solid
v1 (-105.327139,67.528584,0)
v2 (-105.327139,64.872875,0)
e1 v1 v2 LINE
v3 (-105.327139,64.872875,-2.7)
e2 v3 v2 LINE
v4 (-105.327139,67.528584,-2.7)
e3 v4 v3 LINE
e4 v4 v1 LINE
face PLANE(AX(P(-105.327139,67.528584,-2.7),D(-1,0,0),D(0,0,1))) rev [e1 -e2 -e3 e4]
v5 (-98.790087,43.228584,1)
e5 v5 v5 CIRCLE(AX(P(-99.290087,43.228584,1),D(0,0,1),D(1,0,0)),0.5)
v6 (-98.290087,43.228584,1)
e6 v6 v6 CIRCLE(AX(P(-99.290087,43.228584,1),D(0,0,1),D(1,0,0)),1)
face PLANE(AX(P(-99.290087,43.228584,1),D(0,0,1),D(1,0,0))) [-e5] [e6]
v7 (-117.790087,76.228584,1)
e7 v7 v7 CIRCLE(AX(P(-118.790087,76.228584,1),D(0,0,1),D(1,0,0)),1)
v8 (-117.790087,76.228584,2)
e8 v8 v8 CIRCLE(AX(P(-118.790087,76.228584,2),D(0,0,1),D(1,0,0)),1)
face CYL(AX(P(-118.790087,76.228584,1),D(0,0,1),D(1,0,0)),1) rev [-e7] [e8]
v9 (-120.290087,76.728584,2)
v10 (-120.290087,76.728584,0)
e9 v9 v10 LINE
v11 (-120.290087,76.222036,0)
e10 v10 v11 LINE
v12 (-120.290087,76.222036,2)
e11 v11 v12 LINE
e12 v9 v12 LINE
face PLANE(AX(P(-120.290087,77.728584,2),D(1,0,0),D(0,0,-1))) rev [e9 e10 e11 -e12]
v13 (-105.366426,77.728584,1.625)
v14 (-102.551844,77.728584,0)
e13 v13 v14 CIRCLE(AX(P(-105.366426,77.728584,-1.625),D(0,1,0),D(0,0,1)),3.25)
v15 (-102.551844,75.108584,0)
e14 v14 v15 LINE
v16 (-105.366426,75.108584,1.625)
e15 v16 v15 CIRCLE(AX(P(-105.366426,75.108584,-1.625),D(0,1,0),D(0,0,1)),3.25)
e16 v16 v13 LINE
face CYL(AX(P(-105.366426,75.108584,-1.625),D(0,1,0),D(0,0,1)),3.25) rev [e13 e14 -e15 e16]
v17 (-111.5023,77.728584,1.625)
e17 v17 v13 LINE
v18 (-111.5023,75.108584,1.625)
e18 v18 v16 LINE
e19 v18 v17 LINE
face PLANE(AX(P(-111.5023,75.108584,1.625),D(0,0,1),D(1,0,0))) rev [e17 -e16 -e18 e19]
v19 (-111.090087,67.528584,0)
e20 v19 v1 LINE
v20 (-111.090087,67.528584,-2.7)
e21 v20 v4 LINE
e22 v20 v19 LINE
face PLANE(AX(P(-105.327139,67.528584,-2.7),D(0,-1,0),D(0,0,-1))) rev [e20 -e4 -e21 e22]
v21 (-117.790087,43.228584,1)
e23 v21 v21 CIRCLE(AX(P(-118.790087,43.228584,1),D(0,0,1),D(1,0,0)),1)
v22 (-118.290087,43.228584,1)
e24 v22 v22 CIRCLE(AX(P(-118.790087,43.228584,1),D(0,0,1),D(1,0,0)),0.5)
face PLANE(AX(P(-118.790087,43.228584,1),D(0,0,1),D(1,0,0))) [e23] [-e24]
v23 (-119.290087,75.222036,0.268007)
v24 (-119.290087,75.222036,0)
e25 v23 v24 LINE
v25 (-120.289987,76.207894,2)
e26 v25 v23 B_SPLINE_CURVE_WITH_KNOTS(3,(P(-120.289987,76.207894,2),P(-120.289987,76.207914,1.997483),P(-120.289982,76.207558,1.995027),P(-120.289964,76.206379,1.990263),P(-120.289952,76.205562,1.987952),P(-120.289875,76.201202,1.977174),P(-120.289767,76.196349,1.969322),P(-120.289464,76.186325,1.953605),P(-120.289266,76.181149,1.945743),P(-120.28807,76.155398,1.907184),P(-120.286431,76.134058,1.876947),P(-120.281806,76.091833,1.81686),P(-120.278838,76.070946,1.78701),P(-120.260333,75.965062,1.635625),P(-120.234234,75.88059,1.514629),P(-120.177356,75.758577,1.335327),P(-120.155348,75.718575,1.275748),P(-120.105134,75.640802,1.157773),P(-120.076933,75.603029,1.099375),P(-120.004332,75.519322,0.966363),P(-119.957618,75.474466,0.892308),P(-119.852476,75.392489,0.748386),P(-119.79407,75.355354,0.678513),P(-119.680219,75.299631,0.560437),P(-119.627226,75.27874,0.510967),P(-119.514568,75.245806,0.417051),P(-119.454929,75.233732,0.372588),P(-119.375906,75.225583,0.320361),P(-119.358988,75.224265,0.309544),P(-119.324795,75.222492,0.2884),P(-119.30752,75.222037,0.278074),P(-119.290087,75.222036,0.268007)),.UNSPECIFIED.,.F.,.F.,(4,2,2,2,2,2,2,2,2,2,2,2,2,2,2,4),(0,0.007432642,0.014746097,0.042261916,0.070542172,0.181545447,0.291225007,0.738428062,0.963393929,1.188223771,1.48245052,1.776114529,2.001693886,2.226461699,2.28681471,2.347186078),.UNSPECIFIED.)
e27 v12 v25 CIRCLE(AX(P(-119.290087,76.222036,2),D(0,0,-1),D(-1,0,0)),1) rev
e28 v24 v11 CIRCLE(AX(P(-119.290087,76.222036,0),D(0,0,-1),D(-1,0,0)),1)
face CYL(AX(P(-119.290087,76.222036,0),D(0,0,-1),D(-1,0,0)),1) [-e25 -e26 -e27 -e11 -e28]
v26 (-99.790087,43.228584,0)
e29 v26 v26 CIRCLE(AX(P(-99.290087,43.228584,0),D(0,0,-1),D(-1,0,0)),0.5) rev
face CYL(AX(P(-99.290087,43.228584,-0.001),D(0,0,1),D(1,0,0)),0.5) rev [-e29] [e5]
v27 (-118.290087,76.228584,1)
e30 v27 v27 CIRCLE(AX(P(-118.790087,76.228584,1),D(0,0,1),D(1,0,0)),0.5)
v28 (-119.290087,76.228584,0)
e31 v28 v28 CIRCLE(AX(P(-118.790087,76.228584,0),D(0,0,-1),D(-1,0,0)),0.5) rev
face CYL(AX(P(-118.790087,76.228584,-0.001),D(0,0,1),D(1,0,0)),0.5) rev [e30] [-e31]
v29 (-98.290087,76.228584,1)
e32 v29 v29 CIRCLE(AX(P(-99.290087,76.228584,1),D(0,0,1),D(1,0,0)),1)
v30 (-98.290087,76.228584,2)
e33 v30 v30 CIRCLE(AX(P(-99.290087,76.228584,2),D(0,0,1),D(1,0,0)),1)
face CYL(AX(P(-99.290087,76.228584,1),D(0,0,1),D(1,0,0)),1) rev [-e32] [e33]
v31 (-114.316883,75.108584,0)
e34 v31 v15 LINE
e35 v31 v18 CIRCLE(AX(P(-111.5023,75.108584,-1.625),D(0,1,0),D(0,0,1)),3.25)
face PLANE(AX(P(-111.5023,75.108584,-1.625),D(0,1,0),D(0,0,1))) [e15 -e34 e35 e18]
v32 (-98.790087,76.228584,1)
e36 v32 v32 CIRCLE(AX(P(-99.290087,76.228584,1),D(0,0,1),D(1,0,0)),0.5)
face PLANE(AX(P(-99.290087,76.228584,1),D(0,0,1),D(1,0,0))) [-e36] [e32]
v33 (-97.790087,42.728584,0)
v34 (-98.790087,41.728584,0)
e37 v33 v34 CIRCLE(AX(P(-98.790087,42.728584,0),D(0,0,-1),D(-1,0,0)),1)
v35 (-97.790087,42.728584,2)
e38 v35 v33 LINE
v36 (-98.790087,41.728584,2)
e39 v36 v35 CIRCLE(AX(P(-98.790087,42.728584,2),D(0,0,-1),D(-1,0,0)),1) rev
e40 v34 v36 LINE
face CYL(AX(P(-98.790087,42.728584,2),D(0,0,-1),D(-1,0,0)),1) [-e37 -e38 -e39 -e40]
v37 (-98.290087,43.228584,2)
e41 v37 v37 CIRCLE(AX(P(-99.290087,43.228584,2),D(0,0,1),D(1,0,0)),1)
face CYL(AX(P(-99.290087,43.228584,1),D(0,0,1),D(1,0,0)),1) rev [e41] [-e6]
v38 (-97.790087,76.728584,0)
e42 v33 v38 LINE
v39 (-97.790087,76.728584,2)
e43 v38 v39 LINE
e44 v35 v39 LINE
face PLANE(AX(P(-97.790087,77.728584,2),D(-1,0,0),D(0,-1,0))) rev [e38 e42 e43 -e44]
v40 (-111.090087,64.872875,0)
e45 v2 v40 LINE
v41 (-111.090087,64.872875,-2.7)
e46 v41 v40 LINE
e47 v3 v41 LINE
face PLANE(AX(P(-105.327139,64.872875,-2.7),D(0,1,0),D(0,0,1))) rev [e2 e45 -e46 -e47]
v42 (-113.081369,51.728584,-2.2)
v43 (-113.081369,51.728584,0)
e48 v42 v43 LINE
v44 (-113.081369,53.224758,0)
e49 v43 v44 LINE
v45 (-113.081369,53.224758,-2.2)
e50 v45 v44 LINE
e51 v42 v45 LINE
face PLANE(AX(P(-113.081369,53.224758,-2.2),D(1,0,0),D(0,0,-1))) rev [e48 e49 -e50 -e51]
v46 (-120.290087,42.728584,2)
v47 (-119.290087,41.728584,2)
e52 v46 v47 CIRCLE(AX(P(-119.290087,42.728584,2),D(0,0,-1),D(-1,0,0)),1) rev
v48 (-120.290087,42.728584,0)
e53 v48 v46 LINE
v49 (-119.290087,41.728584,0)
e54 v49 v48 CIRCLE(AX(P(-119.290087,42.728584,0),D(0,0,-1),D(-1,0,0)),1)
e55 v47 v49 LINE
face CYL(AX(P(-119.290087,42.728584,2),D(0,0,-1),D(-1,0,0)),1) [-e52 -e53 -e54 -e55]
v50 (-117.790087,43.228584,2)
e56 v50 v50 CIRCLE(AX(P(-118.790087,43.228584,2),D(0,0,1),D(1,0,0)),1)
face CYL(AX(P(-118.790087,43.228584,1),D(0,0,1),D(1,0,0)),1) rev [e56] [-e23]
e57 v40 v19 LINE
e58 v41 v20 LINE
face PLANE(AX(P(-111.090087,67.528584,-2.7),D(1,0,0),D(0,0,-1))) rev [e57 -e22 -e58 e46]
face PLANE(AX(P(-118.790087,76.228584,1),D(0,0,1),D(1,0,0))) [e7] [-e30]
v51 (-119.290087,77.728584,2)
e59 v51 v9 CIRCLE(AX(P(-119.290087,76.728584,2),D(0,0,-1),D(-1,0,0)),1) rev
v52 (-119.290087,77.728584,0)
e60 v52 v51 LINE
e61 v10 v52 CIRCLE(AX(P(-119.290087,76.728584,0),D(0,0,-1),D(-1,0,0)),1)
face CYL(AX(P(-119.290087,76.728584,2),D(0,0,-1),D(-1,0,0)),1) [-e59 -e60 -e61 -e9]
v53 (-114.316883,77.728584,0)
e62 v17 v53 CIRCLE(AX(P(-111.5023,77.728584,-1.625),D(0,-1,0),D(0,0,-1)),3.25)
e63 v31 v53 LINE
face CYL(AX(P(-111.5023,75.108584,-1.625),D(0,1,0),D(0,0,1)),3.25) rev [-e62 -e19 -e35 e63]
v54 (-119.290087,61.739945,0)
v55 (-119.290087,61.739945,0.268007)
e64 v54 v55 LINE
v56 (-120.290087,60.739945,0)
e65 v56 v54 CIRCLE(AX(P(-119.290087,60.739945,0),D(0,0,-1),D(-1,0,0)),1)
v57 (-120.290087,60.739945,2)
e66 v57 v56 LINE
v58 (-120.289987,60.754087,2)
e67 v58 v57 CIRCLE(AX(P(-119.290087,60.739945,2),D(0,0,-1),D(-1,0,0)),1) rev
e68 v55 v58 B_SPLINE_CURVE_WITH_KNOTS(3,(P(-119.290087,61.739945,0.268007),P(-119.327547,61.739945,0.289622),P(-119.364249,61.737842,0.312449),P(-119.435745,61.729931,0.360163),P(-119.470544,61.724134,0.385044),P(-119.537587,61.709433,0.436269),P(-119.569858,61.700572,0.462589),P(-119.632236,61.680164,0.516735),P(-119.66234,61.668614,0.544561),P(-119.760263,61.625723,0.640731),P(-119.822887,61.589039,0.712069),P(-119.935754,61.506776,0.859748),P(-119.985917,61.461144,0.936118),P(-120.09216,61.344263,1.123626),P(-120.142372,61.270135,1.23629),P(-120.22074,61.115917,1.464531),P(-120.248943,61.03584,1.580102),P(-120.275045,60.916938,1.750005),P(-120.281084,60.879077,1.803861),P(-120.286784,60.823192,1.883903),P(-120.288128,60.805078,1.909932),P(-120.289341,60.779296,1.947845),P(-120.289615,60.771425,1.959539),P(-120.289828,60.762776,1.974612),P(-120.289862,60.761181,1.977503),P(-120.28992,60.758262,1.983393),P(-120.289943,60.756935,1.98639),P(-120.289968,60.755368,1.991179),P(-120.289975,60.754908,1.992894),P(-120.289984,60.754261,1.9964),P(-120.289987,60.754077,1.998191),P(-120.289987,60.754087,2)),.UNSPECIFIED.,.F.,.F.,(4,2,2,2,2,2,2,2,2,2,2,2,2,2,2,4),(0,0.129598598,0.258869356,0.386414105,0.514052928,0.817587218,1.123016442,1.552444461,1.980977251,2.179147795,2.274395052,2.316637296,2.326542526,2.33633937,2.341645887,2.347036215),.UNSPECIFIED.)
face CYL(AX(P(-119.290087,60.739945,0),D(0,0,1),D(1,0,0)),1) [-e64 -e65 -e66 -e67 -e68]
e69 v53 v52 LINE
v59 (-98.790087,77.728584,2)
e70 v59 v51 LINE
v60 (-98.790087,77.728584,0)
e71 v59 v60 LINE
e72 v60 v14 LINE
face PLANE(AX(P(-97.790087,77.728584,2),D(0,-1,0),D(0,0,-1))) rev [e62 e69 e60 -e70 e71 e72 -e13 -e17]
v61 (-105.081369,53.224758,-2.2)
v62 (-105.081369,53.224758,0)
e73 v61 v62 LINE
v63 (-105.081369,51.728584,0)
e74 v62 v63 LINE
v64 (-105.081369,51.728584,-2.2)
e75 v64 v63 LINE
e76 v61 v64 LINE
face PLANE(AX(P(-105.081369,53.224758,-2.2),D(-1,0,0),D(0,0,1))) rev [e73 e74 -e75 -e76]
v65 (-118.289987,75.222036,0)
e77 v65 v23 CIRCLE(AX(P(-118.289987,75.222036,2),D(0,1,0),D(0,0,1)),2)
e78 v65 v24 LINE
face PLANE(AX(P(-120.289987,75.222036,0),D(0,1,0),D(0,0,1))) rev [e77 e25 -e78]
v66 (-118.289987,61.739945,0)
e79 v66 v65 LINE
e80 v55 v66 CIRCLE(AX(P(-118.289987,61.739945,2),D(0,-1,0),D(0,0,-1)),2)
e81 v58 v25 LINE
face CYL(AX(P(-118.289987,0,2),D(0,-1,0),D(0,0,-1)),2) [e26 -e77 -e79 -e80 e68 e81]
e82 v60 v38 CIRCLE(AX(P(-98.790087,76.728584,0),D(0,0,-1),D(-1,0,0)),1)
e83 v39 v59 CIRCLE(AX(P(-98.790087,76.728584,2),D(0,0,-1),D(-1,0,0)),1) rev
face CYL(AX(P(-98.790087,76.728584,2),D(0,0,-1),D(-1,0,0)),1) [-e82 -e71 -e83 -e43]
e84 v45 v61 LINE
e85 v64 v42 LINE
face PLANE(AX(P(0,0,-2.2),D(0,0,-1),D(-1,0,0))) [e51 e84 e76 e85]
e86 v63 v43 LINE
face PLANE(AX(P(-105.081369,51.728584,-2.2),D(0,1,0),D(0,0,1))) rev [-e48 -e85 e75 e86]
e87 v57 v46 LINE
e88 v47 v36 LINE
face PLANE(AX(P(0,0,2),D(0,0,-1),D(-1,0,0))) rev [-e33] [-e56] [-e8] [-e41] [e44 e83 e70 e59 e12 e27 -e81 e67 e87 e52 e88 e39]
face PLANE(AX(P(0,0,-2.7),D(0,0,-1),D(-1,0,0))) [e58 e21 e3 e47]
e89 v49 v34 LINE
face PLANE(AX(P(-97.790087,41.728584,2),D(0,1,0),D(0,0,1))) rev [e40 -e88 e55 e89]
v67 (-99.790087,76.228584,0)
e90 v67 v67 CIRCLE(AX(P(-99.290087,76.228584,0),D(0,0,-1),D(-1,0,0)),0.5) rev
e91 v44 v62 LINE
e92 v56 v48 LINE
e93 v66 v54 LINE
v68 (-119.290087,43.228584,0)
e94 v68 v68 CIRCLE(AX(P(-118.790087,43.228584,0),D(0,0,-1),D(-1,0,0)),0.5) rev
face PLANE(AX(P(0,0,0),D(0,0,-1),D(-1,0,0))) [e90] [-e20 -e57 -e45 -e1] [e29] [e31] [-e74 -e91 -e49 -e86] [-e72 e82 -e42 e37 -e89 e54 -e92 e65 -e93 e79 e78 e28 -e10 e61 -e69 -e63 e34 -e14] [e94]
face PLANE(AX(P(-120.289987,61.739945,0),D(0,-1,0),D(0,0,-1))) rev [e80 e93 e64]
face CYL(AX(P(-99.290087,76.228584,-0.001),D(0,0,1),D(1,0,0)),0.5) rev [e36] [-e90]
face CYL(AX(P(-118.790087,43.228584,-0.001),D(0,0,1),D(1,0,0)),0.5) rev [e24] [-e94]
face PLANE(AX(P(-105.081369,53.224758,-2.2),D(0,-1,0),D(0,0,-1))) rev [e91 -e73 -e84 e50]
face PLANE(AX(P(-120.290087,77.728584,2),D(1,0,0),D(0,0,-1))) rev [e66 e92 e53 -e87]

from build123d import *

# Parameters (mm, degrees)
SKETCH_1_W          = 22.5
SKETCH_1_H          = 36
EXTRUDE_1_DEPTH     = 2
SKETCH_9_R          = 1
CUT_EXTRUDE_3_DEPTH = 1
CUT_EXTRUDE_4_REACH = 145.222
SKETCH_10_R         = 0.5
FILLET_1_R          = 1
SKETCH_11_W         = 5.762947655
SKETCH_11_H         = 2.6557086
EXTRUDE_2_DEPTH     = 2.7
SKETCH_12_W         = 8
SKETCH_12_H         = 1.496173859
EXTRUDE_3_DEPTH     = 2.2
SKETCH_14_W         = 2
SKETCH_14_H         = 13.482091112
CUT_EXTRUDE_6_DEPTH = 0.0001
FILLET_3_R          = 2
CUT_EXTRUDE_7_DEPTH = 2.62
FILLET_7_R          = 1


with BuildPart() as part:
    # 草图1 → 凸台-拉伸1 (new body)
    with BuildSketch(Plane.XY):
        with Locations((-109.040086771, 59.72858385)):
            Rectangle(SKETCH_1_W, SKETCH_1_H)
    extrude(amount=EXTRUDE_1_DEPTH)

    # 草图9 → 切除-拉伸3 (cut)
    with BuildSketch(Plane.XY.offset(2)):
        with Locations((-99.290086771, 76.22858385)):
            Circle(SKETCH_9_R)
        with Locations((-99.290086771, 43.22858385)):
            Circle(SKETCH_9_R)
        with Locations((-118.790086771, 43.22858385)):
            Circle(SKETCH_9_R)
        with Locations((-118.790086771, 76.22858385)):
            Circle(SKETCH_9_R)
    extrude(amount=-CUT_EXTRUDE_3_DEPTH, mode=Mode.SUBTRACT)

    # 草图10 → 切除-拉伸4 (cut, up to next)
    with BuildSketch(Plane.XY.offset(1), mode=Mode.PRIVATE) as cut_extrude_4_sk1:
        with Locations((-118.790086771, 43.22858385)):
            Circle(SKETCH_10_R)
    cut_extrude_4_tool1 = extrude(cut_extrude_4_sk1.sketch, amount=-CUT_EXTRUDE_4_REACH, mode=Mode.PRIVATE) & part.part
    # 草图10 → 切除-拉伸4 (cut, up to next)
    with BuildSketch(Plane.XY.offset(1), mode=Mode.PRIVATE) as cut_extrude_4_sk2:
        with Locations((-99.290086771, 43.22858385)):
            Circle(SKETCH_10_R)
    cut_extrude_4_tool2 = extrude(cut_extrude_4_sk2.sketch, amount=-CUT_EXTRUDE_4_REACH, mode=Mode.PRIVATE) & part.part
    # 草图10 → 切除-拉伸4 (cut, up to next)
    with BuildSketch(Plane.XY.offset(1), mode=Mode.PRIVATE) as cut_extrude_4_sk3:
        with Locations((-99.290086771, 76.22858385)):
            Circle(SKETCH_10_R)
    cut_extrude_4_tool3 = extrude(cut_extrude_4_sk3.sketch, amount=-CUT_EXTRUDE_4_REACH, mode=Mode.PRIVATE) & part.part
    # 草图10 → 切除-拉伸4 (cut, up to next)
    with BuildSketch(Plane.XY.offset(1), mode=Mode.PRIVATE) as cut_extrude_4_sk4:
        with Locations((-118.790086771, 76.22858385)):
            Circle(SKETCH_10_R)
    cut_extrude_4_tool4 = extrude(cut_extrude_4_sk4.sketch, amount=-CUT_EXTRUDE_4_REACH, mode=Mode.PRIVATE) & part.part
    add(cut_extrude_4_tool1.solids().sort_by_distance((-118.790087, 43.228584, 1))[0], mode=Mode.SUBTRACT)
    add(cut_extrude_4_tool2.solids().sort_by_distance((-99.290087, 43.228584, 1))[0], mode=Mode.SUBTRACT)
    add(cut_extrude_4_tool3.solids().sort_by_distance((-99.290087, 76.228584, 1))[0], mode=Mode.SUBTRACT)
    add(cut_extrude_4_tool4.solids().sort_by_distance((-118.790087, 76.228584, 1))[0], mode=Mode.SUBTRACT)

    # 圆角1
    fillet_1_edges = [part.edges().sort_by_distance(p)[0] for p in [
        (-97.790086771, 41.72858385, 1),
        (-120.290086771, 41.72858385, 1),
        (-120.290086771, 77.72858385, 1),
        (-97.790086771, 77.72858385, 1),
    ]]
    fillet(fillet_1_edges, radius=FILLET_1_R)

    # 草图11 → 凸台-拉伸2 (add)
    with BuildSketch(Plane(origin=(0, 0, 0), x_dir=(-1, 0, 0), z_dir=(0, 0, -1))):
        with Locations((108.208612944, 66.20072955)):
            Rectangle(SKETCH_11_W, SKETCH_11_H)
    extrude(amount=EXTRUDE_2_DEPTH)

    # 草图12 → 凸台-拉伸3 (add)
    with BuildSketch(Plane(origin=(0, 0, 0), x_dir=(-1, 0, 0), z_dir=(0, 0, -1))):
        with Locations((109.081368677, 52.476670779)):
            Rectangle(SKETCH_12_W, SKETCH_12_H)
    extrude(amount=EXTRUDE_3_DEPTH)

    # 草图14 → 切除-拉伸6 (cut)
    with BuildSketch(Plane.ZY.offset(120.290086771)):
        with Locations((1, 68.480990424)):
            Rectangle(SKETCH_14_W, SKETCH_14_H)
    extrude(amount=-CUT_EXTRUDE_6_DEPTH, mode=Mode.SUBTRACT)

    # 圆角3
    # the kernel refuses this fillet: 2 mm, written as the material it takes off along each edge
    with BuildSketch(Plane(origin=(-120.289986771, 61.739944868, 0), x_dir=(1, 0, 0), z_dir=(0, 1, 0))) as fillet_3_piece_1:
        with BuildLine():
            CenterArc((FILLET_3_R, -FILLET_3_R), FILLET_3_R, 90, 90)
            Line((0, -FILLET_3_R), (0, 0))
            Line((0, 0), (FILLET_3_R, 0))
        make_face()
    extrude(amount=13.482091112, mode=Mode.SUBTRACT)

    # 草图16 → 切除-拉伸7 (cut)
    with BuildSketch(Plane(origin=(0, 77.72858385, 0), x_dir=(1, 0, 0), z_dir=(0, 1, 0))):
        with BuildLine():
            Line((-111.502300349, 4.875), (-105.366426438, 4.875))
            ThreePointArc((-105.366426438, 4.875), (-102.116426438, 1.625), (-105.366426438, -1.625))
            Line((-105.366426438, -1.625), (-111.502300349, -1.625))
            ThreePointArc((-111.502300349, -1.625), (-114.752300349, 1.625), (-111.502300349, 4.875))
        make_face()
    extrude(amount=-CUT_EXTRUDE_7_DEPTH, mode=Mode.SUBTRACT)

    # 圆角7
    # the kernel refuses this fillet: 1 mm, written as the material it takes off along each edge
    with BuildSketch(Plane(origin=(-120.290086771, 61.739944868, 4.5), x_dir=(0, -1, 0), z_dir=(0, 0, -1))) as fillet_7_piece_1_section:
        with BuildLine():
            CenterArc((FILLET_7_R, -FILLET_7_R), FILLET_7_R, 90, 90)
            Line((0, -FILLET_7_R), (0, 0))
            Line((0, 0), (FILLET_7_R, 0))
        make_face()
    fillet_7_piece_1 = extrude(amount=7, mode=Mode.PRIVATE)
    fillet_7_piece_1 = fillet_7_piece_1 - Plane(origin=(-118.289986771, 61.479548888, 2), x_dir=(1, 0, 0), z_dir=(0, -1, 0)) * Cylinder(2, 18, mode=Mode.PRIVATE)
    add(fillet_7_piece_1, mode=Mode.SUBTRACT)
    with BuildSketch(Plane(origin=(-120.290086771, 75.22203598, -2.5), x_dir=(1, 0, 0), z_dir=(0, 0, 1))) as fillet_7_piece_2_section:
        with BuildLine():
            CenterArc((FILLET_7_R, FILLET_7_R), FILLET_7_R, 180, 90)
            Line((0, FILLET_7_R), (0, 0))
            Line((0, 0), (FILLET_7_R, 0))
        make_face()
    fillet_7_piece_2 = extrude(amount=7, mode=Mode.PRIVATE)
    fillet_7_piece_2 = fillet_7_piece_2 - Plane(origin=(-118.289986771, 75.482431596, 2), x_dir=(1, 0, 0), z_dir=(0, -1, 0)) * Cylinder(2, 18, mode=Mode.PRIVATE)
    add(fillet_7_piece_2, mode=Mode.SUBTRACT)


solid = part.part
